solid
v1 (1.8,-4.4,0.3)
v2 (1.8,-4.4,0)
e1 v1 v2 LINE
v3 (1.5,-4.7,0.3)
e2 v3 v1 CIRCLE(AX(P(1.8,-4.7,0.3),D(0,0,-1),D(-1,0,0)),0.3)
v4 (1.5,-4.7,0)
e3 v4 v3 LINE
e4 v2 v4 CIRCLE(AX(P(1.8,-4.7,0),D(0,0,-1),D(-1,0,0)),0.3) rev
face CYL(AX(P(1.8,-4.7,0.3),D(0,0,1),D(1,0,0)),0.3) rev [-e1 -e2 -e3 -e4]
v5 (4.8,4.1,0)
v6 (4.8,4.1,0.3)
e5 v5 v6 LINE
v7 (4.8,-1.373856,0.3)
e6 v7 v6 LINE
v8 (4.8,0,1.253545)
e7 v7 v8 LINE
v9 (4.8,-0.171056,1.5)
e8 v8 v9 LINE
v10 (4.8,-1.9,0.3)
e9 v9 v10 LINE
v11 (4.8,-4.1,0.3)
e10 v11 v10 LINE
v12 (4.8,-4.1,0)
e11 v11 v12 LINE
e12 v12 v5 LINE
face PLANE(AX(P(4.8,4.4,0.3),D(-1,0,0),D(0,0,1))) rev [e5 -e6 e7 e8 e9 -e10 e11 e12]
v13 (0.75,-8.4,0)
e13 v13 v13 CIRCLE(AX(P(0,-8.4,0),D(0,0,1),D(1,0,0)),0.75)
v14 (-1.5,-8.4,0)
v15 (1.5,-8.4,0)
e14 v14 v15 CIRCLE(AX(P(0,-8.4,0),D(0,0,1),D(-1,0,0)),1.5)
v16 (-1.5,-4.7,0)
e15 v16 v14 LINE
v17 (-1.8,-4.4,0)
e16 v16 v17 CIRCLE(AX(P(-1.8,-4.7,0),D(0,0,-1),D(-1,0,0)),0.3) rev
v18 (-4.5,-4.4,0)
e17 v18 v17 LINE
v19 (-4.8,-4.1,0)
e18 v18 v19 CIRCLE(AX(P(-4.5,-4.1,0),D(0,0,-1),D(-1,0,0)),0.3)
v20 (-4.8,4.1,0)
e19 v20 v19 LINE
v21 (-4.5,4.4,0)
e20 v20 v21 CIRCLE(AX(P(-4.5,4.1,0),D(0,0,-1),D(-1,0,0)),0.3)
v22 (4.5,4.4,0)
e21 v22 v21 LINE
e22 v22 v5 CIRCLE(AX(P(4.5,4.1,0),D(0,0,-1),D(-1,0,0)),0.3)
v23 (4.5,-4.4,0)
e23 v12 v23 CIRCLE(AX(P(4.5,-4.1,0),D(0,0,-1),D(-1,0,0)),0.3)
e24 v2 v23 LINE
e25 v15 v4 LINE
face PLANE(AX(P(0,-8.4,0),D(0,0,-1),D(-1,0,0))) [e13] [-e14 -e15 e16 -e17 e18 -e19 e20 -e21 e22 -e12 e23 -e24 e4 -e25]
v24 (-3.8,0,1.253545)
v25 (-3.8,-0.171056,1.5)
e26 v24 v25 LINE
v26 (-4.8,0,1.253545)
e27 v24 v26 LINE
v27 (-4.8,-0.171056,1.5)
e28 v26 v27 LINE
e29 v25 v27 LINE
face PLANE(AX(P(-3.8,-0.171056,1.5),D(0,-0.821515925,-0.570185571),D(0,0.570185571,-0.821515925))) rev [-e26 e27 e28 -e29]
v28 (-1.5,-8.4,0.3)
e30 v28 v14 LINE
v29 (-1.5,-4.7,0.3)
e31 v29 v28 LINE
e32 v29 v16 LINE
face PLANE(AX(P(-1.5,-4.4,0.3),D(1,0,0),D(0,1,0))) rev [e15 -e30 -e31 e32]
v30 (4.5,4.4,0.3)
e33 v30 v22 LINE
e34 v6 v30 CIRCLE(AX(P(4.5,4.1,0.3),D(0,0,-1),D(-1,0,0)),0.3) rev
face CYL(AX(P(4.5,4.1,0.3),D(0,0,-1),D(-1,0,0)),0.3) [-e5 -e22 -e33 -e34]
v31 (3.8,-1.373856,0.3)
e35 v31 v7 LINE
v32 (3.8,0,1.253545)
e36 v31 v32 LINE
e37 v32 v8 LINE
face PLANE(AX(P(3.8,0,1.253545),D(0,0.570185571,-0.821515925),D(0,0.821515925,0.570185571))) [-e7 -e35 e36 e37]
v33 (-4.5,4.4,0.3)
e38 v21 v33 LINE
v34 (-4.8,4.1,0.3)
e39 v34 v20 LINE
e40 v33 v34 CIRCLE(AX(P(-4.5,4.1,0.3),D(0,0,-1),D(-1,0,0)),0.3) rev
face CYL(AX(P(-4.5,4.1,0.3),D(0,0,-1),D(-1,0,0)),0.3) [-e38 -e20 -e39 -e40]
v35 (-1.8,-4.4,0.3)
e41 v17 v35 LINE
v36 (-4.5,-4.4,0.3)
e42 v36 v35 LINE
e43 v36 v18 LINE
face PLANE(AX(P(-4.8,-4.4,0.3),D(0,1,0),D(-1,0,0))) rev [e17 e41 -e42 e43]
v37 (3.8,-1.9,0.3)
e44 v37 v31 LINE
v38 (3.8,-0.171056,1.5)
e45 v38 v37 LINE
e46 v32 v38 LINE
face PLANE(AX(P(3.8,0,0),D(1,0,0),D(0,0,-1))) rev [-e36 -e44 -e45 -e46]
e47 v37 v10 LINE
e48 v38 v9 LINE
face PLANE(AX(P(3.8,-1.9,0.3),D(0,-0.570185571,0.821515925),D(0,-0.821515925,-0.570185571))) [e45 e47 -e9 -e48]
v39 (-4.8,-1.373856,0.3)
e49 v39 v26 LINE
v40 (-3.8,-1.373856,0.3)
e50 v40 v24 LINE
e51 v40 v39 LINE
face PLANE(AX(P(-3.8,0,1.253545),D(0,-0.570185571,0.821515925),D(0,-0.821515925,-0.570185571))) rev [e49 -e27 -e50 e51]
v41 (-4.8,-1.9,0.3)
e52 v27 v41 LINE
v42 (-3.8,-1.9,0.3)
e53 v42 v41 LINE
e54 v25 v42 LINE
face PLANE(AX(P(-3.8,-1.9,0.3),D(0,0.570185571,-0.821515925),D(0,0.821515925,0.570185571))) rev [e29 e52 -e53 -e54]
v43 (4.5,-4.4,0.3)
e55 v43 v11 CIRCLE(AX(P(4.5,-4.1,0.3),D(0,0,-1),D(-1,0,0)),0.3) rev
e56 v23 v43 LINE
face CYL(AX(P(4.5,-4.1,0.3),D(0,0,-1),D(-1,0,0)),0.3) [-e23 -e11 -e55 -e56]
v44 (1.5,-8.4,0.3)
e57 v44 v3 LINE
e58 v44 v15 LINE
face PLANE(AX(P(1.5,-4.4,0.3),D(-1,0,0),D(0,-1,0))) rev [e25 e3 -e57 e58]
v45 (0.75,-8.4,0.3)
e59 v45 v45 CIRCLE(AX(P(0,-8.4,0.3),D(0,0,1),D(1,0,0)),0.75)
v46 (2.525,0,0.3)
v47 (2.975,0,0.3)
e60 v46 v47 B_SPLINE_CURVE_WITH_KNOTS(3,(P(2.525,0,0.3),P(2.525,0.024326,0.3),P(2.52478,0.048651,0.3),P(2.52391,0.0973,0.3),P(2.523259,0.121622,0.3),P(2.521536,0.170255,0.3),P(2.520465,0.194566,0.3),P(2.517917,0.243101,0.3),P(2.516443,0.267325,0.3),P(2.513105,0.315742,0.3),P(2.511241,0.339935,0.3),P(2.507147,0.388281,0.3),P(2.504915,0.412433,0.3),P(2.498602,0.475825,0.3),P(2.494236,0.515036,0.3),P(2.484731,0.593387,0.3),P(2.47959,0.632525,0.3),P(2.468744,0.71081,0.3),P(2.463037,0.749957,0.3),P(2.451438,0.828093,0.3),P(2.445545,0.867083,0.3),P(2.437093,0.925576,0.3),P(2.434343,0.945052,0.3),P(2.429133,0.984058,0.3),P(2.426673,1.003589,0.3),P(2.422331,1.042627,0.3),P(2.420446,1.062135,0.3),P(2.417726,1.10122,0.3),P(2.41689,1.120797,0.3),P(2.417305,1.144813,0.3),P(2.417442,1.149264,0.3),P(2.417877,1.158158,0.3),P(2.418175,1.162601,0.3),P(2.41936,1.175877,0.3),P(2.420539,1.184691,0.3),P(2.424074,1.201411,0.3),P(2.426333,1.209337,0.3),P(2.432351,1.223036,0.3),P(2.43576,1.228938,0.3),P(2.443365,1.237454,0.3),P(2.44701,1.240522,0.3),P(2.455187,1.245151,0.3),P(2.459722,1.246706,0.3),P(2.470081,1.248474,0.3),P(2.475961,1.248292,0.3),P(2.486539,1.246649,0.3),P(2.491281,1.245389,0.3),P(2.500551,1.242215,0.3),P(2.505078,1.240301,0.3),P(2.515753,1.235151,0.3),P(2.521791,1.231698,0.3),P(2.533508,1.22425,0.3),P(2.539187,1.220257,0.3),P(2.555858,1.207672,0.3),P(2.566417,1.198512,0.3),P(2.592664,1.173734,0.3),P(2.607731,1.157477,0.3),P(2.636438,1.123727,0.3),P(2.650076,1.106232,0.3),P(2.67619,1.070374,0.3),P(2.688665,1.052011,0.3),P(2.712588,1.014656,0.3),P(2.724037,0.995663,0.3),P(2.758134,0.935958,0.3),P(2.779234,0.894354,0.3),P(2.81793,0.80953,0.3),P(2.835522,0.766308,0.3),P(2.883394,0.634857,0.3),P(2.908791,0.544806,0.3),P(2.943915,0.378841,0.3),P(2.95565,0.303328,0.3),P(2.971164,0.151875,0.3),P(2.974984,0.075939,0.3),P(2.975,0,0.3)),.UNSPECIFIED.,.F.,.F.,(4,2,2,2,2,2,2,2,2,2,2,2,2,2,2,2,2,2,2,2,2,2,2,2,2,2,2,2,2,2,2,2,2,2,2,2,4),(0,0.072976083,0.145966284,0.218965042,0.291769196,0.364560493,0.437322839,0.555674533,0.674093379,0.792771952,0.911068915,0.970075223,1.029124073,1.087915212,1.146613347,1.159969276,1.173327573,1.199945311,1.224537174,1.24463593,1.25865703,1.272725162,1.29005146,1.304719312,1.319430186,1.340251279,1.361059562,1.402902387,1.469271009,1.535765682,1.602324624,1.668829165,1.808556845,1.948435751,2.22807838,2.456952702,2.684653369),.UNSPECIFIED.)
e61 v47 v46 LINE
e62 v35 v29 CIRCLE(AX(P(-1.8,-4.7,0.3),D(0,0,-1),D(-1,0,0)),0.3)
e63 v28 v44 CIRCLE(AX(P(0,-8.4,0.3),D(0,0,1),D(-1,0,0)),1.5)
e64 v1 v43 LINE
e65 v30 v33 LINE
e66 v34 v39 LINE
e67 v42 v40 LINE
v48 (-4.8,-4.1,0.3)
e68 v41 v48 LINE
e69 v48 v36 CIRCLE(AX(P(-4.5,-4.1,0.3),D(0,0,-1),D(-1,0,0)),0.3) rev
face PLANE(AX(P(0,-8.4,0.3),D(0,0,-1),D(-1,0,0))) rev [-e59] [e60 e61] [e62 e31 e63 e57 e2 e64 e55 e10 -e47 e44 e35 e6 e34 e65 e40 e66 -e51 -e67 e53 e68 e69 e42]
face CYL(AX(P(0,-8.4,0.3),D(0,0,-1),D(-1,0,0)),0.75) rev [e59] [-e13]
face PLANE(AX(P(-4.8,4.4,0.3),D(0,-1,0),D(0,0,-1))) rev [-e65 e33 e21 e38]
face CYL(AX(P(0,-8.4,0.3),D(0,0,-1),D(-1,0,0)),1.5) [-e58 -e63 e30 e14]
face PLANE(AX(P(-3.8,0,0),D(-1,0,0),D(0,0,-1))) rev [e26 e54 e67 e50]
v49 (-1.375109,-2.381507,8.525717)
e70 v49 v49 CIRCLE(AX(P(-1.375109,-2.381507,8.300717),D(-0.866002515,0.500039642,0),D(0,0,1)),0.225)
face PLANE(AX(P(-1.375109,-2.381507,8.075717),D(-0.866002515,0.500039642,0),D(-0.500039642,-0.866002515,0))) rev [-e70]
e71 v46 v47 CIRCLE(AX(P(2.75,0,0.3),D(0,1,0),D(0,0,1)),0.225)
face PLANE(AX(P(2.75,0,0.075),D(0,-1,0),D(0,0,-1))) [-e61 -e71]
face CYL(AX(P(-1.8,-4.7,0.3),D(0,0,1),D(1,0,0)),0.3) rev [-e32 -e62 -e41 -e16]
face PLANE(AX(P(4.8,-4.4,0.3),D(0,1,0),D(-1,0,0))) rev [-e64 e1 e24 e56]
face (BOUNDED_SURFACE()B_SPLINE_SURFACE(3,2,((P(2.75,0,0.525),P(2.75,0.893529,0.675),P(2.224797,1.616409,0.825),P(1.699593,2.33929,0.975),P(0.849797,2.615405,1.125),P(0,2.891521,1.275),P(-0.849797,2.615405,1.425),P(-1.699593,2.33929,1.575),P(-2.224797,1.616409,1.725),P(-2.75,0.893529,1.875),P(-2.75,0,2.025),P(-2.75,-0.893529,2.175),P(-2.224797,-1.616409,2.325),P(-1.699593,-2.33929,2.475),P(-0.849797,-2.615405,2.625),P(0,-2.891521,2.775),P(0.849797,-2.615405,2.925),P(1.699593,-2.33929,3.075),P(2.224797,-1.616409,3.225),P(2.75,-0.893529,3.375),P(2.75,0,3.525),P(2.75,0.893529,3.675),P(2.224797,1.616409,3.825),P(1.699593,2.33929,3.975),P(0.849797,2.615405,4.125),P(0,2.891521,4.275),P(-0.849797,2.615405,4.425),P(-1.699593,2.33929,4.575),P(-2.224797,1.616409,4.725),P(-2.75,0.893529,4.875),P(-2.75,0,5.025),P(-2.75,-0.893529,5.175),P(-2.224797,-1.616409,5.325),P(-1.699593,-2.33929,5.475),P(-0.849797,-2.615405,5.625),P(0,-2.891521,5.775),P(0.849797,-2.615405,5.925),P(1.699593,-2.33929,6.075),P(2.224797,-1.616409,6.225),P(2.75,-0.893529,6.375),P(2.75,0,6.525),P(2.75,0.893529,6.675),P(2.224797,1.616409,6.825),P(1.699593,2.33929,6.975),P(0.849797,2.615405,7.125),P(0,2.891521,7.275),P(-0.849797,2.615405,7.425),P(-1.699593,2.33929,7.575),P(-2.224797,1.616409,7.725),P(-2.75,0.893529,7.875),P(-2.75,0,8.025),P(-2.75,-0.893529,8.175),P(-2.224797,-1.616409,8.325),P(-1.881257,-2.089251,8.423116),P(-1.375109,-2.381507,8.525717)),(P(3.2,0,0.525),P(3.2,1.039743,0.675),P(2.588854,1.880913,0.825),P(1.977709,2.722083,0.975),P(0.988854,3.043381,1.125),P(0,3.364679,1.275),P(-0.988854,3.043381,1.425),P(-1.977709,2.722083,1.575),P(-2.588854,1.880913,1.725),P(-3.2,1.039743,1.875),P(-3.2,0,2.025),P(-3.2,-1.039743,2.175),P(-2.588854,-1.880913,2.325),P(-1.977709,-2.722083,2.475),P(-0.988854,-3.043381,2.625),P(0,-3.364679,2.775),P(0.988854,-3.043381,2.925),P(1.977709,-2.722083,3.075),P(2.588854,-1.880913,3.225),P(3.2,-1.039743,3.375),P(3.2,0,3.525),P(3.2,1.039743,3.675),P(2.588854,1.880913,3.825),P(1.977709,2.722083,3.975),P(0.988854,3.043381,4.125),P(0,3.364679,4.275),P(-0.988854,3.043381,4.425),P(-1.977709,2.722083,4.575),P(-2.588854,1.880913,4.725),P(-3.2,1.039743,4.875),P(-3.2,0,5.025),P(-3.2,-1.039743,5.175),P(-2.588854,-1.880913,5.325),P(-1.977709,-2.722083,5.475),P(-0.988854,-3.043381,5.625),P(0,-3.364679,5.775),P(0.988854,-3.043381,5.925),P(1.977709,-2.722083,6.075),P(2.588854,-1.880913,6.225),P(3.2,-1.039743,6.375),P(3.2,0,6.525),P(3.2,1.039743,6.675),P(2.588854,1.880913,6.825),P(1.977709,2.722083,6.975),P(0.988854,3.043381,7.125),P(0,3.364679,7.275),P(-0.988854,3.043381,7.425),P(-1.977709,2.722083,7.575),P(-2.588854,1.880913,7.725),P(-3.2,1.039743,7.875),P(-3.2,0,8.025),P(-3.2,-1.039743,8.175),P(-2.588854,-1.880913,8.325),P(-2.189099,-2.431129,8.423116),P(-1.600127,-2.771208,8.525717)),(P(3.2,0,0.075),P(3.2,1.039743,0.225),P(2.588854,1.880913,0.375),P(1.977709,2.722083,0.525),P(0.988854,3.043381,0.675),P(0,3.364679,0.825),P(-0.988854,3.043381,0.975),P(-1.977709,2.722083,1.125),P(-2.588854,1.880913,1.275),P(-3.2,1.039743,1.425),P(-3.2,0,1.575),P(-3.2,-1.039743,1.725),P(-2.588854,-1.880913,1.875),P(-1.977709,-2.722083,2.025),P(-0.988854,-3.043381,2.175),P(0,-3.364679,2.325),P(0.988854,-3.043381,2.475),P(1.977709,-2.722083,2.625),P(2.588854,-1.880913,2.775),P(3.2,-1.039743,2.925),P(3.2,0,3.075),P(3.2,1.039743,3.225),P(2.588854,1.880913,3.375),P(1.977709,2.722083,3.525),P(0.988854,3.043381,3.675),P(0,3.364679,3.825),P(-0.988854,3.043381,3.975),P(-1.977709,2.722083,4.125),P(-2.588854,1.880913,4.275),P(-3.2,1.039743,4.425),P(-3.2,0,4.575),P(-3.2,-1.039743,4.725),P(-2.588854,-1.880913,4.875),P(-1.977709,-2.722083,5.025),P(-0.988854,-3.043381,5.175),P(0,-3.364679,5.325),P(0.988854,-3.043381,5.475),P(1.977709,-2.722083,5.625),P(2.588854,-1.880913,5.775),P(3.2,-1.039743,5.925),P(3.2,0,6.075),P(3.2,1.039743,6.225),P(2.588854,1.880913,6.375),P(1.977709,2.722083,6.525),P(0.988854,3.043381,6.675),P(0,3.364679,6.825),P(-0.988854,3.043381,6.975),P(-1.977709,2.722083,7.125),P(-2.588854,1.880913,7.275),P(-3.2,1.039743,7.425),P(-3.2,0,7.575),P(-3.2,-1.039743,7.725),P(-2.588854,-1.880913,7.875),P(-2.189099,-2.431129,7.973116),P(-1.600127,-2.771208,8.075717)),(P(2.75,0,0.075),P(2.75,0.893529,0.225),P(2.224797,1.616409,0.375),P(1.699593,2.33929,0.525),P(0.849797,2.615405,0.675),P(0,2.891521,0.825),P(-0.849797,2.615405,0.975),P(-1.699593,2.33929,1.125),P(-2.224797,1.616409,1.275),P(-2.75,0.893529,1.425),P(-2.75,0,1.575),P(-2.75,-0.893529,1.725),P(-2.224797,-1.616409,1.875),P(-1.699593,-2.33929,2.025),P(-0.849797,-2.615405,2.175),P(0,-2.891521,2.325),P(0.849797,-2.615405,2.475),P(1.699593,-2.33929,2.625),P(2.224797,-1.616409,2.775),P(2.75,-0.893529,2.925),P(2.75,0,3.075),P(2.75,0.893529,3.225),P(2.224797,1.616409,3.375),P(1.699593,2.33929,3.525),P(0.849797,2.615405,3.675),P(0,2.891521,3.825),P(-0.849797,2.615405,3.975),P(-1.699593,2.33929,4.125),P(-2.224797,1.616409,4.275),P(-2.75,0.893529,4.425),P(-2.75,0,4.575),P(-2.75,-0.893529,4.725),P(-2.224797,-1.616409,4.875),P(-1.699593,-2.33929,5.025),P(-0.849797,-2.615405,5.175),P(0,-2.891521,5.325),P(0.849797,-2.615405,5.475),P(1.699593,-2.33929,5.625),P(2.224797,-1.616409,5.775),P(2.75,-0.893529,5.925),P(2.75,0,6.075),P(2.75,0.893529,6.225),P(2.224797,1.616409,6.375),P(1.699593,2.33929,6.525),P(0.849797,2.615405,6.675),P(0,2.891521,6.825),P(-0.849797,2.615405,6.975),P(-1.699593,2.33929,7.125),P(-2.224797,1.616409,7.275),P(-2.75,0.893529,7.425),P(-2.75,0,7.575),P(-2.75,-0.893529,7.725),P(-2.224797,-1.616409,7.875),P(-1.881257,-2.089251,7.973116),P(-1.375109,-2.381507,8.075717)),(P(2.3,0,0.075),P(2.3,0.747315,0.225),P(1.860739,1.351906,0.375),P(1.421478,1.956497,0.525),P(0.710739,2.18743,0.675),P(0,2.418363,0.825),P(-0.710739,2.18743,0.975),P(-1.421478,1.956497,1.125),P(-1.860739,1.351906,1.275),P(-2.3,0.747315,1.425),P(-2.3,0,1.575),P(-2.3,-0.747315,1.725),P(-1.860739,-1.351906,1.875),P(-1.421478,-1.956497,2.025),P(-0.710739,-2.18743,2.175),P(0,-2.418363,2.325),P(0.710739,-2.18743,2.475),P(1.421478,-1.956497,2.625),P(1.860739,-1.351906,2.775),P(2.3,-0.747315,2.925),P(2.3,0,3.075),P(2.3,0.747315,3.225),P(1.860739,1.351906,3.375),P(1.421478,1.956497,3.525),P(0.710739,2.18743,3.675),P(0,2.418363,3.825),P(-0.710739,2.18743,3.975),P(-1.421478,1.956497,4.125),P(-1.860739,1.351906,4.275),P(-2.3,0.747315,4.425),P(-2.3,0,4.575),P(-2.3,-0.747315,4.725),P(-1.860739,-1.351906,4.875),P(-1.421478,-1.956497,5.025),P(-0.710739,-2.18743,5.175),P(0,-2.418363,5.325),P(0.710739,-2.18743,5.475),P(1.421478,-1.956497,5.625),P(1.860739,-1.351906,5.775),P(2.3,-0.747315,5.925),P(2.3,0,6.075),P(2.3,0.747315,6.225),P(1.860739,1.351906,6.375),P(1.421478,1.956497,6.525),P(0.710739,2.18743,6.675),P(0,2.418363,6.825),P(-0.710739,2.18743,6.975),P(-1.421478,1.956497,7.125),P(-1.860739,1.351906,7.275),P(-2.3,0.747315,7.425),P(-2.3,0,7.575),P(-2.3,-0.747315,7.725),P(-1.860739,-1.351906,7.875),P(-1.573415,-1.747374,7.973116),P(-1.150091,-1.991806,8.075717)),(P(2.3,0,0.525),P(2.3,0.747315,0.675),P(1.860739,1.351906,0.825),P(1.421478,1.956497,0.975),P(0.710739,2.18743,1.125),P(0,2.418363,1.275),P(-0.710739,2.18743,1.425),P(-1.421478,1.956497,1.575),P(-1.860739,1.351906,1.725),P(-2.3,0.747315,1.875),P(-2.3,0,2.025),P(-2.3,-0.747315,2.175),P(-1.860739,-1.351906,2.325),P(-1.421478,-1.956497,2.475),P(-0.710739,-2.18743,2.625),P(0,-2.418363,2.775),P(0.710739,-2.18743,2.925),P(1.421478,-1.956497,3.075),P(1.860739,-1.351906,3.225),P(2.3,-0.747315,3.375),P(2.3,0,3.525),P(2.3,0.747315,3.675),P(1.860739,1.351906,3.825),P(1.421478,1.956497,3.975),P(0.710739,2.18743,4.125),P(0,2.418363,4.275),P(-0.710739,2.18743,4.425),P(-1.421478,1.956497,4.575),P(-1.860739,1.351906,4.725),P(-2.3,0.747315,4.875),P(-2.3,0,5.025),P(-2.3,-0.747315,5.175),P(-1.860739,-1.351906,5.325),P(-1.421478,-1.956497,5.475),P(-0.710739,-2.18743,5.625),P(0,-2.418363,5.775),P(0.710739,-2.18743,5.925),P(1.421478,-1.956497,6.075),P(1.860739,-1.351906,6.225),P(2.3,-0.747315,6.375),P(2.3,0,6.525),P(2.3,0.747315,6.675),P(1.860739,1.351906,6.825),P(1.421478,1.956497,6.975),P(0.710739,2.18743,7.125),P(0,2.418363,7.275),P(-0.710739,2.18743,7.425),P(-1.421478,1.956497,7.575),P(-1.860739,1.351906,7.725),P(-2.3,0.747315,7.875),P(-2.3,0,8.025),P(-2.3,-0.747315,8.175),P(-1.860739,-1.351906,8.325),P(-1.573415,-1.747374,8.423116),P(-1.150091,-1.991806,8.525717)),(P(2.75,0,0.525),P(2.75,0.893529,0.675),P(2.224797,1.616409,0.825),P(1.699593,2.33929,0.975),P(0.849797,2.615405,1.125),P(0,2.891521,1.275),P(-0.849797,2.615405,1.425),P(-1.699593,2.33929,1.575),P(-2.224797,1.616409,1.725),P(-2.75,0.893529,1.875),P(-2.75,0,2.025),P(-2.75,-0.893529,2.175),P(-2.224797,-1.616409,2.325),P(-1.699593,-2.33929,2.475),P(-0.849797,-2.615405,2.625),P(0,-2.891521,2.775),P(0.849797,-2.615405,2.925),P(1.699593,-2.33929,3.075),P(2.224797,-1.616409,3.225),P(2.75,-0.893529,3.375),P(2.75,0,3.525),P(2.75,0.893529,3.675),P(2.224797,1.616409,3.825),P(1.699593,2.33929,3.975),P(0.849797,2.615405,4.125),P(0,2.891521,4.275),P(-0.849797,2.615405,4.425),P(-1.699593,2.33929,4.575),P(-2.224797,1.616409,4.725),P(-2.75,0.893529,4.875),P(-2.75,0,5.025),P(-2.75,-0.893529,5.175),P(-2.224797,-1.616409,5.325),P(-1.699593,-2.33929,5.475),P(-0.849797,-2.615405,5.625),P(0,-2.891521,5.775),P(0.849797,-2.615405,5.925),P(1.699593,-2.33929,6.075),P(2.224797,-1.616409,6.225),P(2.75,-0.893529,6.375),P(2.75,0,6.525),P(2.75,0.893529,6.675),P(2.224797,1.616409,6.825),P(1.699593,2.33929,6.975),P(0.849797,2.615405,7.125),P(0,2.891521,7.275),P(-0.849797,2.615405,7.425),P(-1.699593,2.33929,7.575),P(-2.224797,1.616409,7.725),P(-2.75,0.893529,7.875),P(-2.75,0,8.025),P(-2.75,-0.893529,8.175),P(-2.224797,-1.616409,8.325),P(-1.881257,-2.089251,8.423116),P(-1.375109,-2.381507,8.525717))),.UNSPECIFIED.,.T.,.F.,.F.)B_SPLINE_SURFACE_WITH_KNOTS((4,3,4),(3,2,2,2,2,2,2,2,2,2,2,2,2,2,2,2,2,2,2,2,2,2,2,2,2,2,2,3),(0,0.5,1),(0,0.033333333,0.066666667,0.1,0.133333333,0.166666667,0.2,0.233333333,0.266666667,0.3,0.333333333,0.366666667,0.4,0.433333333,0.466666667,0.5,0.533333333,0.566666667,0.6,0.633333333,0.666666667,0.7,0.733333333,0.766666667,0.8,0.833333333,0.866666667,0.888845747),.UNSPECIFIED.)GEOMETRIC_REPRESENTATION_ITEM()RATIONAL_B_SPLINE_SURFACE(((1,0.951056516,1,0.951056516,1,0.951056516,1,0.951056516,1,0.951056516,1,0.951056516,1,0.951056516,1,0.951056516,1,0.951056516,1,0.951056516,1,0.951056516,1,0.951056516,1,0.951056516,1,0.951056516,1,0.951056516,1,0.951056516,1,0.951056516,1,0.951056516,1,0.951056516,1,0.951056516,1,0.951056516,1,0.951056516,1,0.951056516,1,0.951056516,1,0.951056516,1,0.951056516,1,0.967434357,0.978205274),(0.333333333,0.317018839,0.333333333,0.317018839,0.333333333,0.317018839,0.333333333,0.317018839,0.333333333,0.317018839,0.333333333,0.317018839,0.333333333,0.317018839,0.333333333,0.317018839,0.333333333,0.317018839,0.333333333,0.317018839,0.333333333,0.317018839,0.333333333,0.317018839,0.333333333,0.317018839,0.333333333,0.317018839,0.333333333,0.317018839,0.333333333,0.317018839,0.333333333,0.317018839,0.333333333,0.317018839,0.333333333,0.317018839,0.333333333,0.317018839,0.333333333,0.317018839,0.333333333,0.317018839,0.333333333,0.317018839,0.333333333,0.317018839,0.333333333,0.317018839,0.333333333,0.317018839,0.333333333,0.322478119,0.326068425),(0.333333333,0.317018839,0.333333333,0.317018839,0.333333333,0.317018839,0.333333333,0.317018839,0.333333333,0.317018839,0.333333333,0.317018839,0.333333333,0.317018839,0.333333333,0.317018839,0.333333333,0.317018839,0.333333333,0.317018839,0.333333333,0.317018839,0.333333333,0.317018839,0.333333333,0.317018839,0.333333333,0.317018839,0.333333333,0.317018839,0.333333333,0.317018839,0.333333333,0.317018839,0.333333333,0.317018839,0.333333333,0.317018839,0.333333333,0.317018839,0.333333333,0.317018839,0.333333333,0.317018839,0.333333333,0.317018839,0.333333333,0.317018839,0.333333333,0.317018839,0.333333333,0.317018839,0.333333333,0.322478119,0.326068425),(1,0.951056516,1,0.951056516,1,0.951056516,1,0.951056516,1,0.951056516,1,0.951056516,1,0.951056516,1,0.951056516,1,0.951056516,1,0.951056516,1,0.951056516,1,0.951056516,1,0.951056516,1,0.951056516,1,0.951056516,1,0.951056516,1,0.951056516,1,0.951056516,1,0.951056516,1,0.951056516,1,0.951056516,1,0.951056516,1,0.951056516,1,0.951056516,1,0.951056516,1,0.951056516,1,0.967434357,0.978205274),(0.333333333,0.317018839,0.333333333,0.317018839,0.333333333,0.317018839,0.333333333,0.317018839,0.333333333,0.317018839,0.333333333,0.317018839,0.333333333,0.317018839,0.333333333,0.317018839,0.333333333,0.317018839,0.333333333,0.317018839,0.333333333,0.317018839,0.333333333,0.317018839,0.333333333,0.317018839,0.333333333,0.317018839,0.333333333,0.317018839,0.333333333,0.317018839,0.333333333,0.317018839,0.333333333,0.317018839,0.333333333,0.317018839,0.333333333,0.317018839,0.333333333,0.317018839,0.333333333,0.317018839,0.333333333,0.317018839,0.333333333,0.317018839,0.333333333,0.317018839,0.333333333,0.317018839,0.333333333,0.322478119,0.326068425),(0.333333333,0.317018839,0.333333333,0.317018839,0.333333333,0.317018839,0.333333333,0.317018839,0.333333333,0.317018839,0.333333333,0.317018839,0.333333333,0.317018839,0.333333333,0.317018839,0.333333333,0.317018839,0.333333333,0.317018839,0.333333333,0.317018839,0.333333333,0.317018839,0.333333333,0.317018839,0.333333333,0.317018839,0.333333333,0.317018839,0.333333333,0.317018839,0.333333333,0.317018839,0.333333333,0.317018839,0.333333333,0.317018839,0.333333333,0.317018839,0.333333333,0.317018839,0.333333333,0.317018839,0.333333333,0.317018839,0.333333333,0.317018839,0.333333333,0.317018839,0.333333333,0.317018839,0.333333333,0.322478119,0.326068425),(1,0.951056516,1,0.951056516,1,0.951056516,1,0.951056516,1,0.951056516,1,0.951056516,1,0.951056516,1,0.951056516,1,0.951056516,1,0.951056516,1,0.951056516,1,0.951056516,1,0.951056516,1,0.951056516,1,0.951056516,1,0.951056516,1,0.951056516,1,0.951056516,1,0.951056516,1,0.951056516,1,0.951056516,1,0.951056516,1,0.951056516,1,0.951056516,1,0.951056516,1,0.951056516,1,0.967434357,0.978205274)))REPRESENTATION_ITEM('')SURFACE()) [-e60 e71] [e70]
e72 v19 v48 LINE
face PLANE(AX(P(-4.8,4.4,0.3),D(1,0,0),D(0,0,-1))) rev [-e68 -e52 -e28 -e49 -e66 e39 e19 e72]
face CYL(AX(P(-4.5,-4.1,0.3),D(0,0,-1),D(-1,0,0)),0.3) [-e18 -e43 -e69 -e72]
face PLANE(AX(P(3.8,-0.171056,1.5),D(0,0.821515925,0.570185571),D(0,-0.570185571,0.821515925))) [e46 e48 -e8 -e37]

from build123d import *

# Parameters (mm, degrees)
SKETCH1_R           = 0.75
BOSS_EXTRUDE1_DEPTH = 0.3
FILLET1_R           = 0.3
BOSS_EXTRUDE2_DEPTH = 1
SWEEP1_PITCH        = 3


with BuildPart() as part:
    # Sketch1 → Boss-Extrude1 (new body)
    with BuildSketch(Plane.XY):
        with BuildLine():
            Line((-4.8, 4.4), (4.8, 4.4))
            Line((4.8, 4.4), (4.8, -4.4))
            Line((4.8, -4.4), (1.5, -4.4))
            Line((1.5, -4.4), (1.5, -8.4))
            ThreePointArc((1.5, -8.4), (0, -9.9), (-1.5, -8.4))
            Line((-1.5, -8.4), (-1.5, -4.4))
            Line((-1.5, -4.4), (-4.8, -4.4))
            Line((-4.8, -4.4), (-4.8, 4.4))
        make_face()
        with Locations((0, -8.4)):
            Circle(SKETCH1_R, mode=Mode.SUBTRACT)
    extrude(amount=BOSS_EXTRUDE1_DEPTH)

    # Fillet1
    fillet1_edges = [part.edges().sort_by_distance(p)[0] for p in [
        (-4.8, -4.4, 0.15),
        (-4.8, 4.4, 0.15),
        (4.8, 4.4, 0.15),
        (4.8, -4.4, 0.15),
        (1.5, -4.4, 0.15),
        (-1.5, -4.4, 0.15),
    ]]
    fillet(fillet1_edges, radius=FILLET1_R)

    # Sketch2 → Boss-Extrude2 (add)
    with BuildSketch(Plane(origin=(4.8, 0, 0), x_dir=(0, 0, -1), z_dir=(1, 0, 0))):
        Polygon((-0.3, -1.9), (-1.5, -0.171055671), (-1.253545223, 0), (-0.3, -1.373855504), align=None)
    boss_extrude2 = extrude(amount=-BOSS_EXTRUDE2_DEPTH)

    # Mirror1: Boss-Extrude2 across plane
    add(boss_extrude2.mirror(Plane(origin=(0, 0, 0), x_dir=(0, 0, 1), z_dir=(1, 0, 0))))

    # Sweep1: the profile of Sketch4 screwed along a right-hand helix of 2.666667 turns, 10 arcs to a turn; built about Z, then put on its axis
    sweep1_z = Axis((0, 0, 0), (0, 0, 1))
    sweep1_corners = [(2.975, 0, 0), (2.75, 0, -0.225), (2.525, 0, 0), (2.75, 0, 0.225)]
    with BuildLine(mode=Mode.PRIVATE) as sweep1_profile:
        ThreePointArc((2.975, 0, 0), (2.909099026, 0, -0.159099026), (2.75, 0, -0.225))
        ThreePointArc((2.75, 0, -0.225), (2.590900974, 0, -0.159099026), (2.525, 0, 0))
        ThreePointArc((2.525, 0, 0), (2.590900974, 0, 0.159099026), (2.75, 0, 0.225))
        ThreePointArc((2.75, 0, 0.225), (2.909099026, 0, 0.159099026), (2.975, 0, 0))
    sweep1_cap = Face(sweep1_profile.wire())
    sweep1_arcs = [((2.975, 0, 0), (2.975, 0, -0.225), (2.75, 0, -0.225), (1, 0.7071067811865475, 1)), ((2.75, 0, -0.225), (2.525, 0, -0.225), (2.525, 0, 0), (1, 0.7071067811865475, 1)), ((2.525, 0, 0), (2.525, 0, 0.225), (2.75, 0, 0.225), (1, 0.7071067811865475, 1)), ((2.75, 0, 0.225), (2.975, 0, 0.225), (2.975, 0, 0), (1, 0.7071067811865475, 1))]  # start, shoulder, end, weights
    sweep1_turn_angles = [0, 18, 36, 54, 72, 90, 108, 126, 144, 162, 180, 198, 216, 234, 252, 270, 288, 306, 324, 342, 360]
    sweep1_turn_weights = [1, 0.9510565162951535, 1, 0.9510565162951535, 1, 0.9510565162951535, 1, 0.9510565162951535, 1, 0.9510565162951535, 1, 0.9510565162951535, 1, 0.9510565162951535, 1, 0.9510565162951535, 1, 0.9510565162951535, 1, 0.9510565162951535, 1]
    sweep1_turn_sides = [Face.make_bezier_surface([[Vector(p[j][0], p[j][1], 0).rotate(sweep1_z, sweep1_turn_angles[2 * i + k]) / sweep1_turn_weights[2 * i + k] + Vector(0, 0, p[j][2] + SWEEP1_PITCH * sweep1_turn_angles[2 * i + k] / 360) for k in range(3)] for j in range(3)], [[p[3][j] * sweep1_turn_weights[2 * i + k] for k in range(3)] for j in range(3)]) for p in sweep1_arcs for i in range(10)]
    sweep1_last_angles = [720, 738, 756, 774, 792, 810, 828, 846, 864, 882, 900, 918, 936, 948, 960]
    sweep1_last_weights = [1, 0.9510565162951535, 1, 0.9510565162951535, 1, 0.9510565162951535, 1, 0.9510565162951535, 1, 0.9510565162951535, 1, 0.9510565162951535, 1, 0.9781476007338026, 1]
    sweep1_last_sides = [Face.make_bezier_surface([[Vector(p[j][0], p[j][1], 0).rotate(sweep1_z, sweep1_last_angles[2 * i + k]) / sweep1_last_weights[2 * i + k] + Vector(0, 0, p[j][2] + SWEEP1_PITCH * sweep1_last_angles[2 * i + k] / 360) for k in range(3)] for j in range(3)], [[p[3][j] * sweep1_last_weights[2 * i + k] for k in range(3)] for j in range(3)]) for p in sweep1_arcs for i in range(7)]
    sweep1 = Plane(origin=(0, 0, 0.3), x_dir=(1, 0, 0), z_dir=(0, 0, 1)) * Solid(Shell([*[p.moved(Location((0, 0, SWEEP1_PITCH * i))) for i in range(2) for p in sweep1_turn_sides], *sweep1_last_sides, sweep1_cap, sweep1_cap.rotate(sweep1_z, 960).moved(Location((0, 0, SWEEP1_PITCH * 960 / 360)))]))
    add(sweep1)


solid = part.part
